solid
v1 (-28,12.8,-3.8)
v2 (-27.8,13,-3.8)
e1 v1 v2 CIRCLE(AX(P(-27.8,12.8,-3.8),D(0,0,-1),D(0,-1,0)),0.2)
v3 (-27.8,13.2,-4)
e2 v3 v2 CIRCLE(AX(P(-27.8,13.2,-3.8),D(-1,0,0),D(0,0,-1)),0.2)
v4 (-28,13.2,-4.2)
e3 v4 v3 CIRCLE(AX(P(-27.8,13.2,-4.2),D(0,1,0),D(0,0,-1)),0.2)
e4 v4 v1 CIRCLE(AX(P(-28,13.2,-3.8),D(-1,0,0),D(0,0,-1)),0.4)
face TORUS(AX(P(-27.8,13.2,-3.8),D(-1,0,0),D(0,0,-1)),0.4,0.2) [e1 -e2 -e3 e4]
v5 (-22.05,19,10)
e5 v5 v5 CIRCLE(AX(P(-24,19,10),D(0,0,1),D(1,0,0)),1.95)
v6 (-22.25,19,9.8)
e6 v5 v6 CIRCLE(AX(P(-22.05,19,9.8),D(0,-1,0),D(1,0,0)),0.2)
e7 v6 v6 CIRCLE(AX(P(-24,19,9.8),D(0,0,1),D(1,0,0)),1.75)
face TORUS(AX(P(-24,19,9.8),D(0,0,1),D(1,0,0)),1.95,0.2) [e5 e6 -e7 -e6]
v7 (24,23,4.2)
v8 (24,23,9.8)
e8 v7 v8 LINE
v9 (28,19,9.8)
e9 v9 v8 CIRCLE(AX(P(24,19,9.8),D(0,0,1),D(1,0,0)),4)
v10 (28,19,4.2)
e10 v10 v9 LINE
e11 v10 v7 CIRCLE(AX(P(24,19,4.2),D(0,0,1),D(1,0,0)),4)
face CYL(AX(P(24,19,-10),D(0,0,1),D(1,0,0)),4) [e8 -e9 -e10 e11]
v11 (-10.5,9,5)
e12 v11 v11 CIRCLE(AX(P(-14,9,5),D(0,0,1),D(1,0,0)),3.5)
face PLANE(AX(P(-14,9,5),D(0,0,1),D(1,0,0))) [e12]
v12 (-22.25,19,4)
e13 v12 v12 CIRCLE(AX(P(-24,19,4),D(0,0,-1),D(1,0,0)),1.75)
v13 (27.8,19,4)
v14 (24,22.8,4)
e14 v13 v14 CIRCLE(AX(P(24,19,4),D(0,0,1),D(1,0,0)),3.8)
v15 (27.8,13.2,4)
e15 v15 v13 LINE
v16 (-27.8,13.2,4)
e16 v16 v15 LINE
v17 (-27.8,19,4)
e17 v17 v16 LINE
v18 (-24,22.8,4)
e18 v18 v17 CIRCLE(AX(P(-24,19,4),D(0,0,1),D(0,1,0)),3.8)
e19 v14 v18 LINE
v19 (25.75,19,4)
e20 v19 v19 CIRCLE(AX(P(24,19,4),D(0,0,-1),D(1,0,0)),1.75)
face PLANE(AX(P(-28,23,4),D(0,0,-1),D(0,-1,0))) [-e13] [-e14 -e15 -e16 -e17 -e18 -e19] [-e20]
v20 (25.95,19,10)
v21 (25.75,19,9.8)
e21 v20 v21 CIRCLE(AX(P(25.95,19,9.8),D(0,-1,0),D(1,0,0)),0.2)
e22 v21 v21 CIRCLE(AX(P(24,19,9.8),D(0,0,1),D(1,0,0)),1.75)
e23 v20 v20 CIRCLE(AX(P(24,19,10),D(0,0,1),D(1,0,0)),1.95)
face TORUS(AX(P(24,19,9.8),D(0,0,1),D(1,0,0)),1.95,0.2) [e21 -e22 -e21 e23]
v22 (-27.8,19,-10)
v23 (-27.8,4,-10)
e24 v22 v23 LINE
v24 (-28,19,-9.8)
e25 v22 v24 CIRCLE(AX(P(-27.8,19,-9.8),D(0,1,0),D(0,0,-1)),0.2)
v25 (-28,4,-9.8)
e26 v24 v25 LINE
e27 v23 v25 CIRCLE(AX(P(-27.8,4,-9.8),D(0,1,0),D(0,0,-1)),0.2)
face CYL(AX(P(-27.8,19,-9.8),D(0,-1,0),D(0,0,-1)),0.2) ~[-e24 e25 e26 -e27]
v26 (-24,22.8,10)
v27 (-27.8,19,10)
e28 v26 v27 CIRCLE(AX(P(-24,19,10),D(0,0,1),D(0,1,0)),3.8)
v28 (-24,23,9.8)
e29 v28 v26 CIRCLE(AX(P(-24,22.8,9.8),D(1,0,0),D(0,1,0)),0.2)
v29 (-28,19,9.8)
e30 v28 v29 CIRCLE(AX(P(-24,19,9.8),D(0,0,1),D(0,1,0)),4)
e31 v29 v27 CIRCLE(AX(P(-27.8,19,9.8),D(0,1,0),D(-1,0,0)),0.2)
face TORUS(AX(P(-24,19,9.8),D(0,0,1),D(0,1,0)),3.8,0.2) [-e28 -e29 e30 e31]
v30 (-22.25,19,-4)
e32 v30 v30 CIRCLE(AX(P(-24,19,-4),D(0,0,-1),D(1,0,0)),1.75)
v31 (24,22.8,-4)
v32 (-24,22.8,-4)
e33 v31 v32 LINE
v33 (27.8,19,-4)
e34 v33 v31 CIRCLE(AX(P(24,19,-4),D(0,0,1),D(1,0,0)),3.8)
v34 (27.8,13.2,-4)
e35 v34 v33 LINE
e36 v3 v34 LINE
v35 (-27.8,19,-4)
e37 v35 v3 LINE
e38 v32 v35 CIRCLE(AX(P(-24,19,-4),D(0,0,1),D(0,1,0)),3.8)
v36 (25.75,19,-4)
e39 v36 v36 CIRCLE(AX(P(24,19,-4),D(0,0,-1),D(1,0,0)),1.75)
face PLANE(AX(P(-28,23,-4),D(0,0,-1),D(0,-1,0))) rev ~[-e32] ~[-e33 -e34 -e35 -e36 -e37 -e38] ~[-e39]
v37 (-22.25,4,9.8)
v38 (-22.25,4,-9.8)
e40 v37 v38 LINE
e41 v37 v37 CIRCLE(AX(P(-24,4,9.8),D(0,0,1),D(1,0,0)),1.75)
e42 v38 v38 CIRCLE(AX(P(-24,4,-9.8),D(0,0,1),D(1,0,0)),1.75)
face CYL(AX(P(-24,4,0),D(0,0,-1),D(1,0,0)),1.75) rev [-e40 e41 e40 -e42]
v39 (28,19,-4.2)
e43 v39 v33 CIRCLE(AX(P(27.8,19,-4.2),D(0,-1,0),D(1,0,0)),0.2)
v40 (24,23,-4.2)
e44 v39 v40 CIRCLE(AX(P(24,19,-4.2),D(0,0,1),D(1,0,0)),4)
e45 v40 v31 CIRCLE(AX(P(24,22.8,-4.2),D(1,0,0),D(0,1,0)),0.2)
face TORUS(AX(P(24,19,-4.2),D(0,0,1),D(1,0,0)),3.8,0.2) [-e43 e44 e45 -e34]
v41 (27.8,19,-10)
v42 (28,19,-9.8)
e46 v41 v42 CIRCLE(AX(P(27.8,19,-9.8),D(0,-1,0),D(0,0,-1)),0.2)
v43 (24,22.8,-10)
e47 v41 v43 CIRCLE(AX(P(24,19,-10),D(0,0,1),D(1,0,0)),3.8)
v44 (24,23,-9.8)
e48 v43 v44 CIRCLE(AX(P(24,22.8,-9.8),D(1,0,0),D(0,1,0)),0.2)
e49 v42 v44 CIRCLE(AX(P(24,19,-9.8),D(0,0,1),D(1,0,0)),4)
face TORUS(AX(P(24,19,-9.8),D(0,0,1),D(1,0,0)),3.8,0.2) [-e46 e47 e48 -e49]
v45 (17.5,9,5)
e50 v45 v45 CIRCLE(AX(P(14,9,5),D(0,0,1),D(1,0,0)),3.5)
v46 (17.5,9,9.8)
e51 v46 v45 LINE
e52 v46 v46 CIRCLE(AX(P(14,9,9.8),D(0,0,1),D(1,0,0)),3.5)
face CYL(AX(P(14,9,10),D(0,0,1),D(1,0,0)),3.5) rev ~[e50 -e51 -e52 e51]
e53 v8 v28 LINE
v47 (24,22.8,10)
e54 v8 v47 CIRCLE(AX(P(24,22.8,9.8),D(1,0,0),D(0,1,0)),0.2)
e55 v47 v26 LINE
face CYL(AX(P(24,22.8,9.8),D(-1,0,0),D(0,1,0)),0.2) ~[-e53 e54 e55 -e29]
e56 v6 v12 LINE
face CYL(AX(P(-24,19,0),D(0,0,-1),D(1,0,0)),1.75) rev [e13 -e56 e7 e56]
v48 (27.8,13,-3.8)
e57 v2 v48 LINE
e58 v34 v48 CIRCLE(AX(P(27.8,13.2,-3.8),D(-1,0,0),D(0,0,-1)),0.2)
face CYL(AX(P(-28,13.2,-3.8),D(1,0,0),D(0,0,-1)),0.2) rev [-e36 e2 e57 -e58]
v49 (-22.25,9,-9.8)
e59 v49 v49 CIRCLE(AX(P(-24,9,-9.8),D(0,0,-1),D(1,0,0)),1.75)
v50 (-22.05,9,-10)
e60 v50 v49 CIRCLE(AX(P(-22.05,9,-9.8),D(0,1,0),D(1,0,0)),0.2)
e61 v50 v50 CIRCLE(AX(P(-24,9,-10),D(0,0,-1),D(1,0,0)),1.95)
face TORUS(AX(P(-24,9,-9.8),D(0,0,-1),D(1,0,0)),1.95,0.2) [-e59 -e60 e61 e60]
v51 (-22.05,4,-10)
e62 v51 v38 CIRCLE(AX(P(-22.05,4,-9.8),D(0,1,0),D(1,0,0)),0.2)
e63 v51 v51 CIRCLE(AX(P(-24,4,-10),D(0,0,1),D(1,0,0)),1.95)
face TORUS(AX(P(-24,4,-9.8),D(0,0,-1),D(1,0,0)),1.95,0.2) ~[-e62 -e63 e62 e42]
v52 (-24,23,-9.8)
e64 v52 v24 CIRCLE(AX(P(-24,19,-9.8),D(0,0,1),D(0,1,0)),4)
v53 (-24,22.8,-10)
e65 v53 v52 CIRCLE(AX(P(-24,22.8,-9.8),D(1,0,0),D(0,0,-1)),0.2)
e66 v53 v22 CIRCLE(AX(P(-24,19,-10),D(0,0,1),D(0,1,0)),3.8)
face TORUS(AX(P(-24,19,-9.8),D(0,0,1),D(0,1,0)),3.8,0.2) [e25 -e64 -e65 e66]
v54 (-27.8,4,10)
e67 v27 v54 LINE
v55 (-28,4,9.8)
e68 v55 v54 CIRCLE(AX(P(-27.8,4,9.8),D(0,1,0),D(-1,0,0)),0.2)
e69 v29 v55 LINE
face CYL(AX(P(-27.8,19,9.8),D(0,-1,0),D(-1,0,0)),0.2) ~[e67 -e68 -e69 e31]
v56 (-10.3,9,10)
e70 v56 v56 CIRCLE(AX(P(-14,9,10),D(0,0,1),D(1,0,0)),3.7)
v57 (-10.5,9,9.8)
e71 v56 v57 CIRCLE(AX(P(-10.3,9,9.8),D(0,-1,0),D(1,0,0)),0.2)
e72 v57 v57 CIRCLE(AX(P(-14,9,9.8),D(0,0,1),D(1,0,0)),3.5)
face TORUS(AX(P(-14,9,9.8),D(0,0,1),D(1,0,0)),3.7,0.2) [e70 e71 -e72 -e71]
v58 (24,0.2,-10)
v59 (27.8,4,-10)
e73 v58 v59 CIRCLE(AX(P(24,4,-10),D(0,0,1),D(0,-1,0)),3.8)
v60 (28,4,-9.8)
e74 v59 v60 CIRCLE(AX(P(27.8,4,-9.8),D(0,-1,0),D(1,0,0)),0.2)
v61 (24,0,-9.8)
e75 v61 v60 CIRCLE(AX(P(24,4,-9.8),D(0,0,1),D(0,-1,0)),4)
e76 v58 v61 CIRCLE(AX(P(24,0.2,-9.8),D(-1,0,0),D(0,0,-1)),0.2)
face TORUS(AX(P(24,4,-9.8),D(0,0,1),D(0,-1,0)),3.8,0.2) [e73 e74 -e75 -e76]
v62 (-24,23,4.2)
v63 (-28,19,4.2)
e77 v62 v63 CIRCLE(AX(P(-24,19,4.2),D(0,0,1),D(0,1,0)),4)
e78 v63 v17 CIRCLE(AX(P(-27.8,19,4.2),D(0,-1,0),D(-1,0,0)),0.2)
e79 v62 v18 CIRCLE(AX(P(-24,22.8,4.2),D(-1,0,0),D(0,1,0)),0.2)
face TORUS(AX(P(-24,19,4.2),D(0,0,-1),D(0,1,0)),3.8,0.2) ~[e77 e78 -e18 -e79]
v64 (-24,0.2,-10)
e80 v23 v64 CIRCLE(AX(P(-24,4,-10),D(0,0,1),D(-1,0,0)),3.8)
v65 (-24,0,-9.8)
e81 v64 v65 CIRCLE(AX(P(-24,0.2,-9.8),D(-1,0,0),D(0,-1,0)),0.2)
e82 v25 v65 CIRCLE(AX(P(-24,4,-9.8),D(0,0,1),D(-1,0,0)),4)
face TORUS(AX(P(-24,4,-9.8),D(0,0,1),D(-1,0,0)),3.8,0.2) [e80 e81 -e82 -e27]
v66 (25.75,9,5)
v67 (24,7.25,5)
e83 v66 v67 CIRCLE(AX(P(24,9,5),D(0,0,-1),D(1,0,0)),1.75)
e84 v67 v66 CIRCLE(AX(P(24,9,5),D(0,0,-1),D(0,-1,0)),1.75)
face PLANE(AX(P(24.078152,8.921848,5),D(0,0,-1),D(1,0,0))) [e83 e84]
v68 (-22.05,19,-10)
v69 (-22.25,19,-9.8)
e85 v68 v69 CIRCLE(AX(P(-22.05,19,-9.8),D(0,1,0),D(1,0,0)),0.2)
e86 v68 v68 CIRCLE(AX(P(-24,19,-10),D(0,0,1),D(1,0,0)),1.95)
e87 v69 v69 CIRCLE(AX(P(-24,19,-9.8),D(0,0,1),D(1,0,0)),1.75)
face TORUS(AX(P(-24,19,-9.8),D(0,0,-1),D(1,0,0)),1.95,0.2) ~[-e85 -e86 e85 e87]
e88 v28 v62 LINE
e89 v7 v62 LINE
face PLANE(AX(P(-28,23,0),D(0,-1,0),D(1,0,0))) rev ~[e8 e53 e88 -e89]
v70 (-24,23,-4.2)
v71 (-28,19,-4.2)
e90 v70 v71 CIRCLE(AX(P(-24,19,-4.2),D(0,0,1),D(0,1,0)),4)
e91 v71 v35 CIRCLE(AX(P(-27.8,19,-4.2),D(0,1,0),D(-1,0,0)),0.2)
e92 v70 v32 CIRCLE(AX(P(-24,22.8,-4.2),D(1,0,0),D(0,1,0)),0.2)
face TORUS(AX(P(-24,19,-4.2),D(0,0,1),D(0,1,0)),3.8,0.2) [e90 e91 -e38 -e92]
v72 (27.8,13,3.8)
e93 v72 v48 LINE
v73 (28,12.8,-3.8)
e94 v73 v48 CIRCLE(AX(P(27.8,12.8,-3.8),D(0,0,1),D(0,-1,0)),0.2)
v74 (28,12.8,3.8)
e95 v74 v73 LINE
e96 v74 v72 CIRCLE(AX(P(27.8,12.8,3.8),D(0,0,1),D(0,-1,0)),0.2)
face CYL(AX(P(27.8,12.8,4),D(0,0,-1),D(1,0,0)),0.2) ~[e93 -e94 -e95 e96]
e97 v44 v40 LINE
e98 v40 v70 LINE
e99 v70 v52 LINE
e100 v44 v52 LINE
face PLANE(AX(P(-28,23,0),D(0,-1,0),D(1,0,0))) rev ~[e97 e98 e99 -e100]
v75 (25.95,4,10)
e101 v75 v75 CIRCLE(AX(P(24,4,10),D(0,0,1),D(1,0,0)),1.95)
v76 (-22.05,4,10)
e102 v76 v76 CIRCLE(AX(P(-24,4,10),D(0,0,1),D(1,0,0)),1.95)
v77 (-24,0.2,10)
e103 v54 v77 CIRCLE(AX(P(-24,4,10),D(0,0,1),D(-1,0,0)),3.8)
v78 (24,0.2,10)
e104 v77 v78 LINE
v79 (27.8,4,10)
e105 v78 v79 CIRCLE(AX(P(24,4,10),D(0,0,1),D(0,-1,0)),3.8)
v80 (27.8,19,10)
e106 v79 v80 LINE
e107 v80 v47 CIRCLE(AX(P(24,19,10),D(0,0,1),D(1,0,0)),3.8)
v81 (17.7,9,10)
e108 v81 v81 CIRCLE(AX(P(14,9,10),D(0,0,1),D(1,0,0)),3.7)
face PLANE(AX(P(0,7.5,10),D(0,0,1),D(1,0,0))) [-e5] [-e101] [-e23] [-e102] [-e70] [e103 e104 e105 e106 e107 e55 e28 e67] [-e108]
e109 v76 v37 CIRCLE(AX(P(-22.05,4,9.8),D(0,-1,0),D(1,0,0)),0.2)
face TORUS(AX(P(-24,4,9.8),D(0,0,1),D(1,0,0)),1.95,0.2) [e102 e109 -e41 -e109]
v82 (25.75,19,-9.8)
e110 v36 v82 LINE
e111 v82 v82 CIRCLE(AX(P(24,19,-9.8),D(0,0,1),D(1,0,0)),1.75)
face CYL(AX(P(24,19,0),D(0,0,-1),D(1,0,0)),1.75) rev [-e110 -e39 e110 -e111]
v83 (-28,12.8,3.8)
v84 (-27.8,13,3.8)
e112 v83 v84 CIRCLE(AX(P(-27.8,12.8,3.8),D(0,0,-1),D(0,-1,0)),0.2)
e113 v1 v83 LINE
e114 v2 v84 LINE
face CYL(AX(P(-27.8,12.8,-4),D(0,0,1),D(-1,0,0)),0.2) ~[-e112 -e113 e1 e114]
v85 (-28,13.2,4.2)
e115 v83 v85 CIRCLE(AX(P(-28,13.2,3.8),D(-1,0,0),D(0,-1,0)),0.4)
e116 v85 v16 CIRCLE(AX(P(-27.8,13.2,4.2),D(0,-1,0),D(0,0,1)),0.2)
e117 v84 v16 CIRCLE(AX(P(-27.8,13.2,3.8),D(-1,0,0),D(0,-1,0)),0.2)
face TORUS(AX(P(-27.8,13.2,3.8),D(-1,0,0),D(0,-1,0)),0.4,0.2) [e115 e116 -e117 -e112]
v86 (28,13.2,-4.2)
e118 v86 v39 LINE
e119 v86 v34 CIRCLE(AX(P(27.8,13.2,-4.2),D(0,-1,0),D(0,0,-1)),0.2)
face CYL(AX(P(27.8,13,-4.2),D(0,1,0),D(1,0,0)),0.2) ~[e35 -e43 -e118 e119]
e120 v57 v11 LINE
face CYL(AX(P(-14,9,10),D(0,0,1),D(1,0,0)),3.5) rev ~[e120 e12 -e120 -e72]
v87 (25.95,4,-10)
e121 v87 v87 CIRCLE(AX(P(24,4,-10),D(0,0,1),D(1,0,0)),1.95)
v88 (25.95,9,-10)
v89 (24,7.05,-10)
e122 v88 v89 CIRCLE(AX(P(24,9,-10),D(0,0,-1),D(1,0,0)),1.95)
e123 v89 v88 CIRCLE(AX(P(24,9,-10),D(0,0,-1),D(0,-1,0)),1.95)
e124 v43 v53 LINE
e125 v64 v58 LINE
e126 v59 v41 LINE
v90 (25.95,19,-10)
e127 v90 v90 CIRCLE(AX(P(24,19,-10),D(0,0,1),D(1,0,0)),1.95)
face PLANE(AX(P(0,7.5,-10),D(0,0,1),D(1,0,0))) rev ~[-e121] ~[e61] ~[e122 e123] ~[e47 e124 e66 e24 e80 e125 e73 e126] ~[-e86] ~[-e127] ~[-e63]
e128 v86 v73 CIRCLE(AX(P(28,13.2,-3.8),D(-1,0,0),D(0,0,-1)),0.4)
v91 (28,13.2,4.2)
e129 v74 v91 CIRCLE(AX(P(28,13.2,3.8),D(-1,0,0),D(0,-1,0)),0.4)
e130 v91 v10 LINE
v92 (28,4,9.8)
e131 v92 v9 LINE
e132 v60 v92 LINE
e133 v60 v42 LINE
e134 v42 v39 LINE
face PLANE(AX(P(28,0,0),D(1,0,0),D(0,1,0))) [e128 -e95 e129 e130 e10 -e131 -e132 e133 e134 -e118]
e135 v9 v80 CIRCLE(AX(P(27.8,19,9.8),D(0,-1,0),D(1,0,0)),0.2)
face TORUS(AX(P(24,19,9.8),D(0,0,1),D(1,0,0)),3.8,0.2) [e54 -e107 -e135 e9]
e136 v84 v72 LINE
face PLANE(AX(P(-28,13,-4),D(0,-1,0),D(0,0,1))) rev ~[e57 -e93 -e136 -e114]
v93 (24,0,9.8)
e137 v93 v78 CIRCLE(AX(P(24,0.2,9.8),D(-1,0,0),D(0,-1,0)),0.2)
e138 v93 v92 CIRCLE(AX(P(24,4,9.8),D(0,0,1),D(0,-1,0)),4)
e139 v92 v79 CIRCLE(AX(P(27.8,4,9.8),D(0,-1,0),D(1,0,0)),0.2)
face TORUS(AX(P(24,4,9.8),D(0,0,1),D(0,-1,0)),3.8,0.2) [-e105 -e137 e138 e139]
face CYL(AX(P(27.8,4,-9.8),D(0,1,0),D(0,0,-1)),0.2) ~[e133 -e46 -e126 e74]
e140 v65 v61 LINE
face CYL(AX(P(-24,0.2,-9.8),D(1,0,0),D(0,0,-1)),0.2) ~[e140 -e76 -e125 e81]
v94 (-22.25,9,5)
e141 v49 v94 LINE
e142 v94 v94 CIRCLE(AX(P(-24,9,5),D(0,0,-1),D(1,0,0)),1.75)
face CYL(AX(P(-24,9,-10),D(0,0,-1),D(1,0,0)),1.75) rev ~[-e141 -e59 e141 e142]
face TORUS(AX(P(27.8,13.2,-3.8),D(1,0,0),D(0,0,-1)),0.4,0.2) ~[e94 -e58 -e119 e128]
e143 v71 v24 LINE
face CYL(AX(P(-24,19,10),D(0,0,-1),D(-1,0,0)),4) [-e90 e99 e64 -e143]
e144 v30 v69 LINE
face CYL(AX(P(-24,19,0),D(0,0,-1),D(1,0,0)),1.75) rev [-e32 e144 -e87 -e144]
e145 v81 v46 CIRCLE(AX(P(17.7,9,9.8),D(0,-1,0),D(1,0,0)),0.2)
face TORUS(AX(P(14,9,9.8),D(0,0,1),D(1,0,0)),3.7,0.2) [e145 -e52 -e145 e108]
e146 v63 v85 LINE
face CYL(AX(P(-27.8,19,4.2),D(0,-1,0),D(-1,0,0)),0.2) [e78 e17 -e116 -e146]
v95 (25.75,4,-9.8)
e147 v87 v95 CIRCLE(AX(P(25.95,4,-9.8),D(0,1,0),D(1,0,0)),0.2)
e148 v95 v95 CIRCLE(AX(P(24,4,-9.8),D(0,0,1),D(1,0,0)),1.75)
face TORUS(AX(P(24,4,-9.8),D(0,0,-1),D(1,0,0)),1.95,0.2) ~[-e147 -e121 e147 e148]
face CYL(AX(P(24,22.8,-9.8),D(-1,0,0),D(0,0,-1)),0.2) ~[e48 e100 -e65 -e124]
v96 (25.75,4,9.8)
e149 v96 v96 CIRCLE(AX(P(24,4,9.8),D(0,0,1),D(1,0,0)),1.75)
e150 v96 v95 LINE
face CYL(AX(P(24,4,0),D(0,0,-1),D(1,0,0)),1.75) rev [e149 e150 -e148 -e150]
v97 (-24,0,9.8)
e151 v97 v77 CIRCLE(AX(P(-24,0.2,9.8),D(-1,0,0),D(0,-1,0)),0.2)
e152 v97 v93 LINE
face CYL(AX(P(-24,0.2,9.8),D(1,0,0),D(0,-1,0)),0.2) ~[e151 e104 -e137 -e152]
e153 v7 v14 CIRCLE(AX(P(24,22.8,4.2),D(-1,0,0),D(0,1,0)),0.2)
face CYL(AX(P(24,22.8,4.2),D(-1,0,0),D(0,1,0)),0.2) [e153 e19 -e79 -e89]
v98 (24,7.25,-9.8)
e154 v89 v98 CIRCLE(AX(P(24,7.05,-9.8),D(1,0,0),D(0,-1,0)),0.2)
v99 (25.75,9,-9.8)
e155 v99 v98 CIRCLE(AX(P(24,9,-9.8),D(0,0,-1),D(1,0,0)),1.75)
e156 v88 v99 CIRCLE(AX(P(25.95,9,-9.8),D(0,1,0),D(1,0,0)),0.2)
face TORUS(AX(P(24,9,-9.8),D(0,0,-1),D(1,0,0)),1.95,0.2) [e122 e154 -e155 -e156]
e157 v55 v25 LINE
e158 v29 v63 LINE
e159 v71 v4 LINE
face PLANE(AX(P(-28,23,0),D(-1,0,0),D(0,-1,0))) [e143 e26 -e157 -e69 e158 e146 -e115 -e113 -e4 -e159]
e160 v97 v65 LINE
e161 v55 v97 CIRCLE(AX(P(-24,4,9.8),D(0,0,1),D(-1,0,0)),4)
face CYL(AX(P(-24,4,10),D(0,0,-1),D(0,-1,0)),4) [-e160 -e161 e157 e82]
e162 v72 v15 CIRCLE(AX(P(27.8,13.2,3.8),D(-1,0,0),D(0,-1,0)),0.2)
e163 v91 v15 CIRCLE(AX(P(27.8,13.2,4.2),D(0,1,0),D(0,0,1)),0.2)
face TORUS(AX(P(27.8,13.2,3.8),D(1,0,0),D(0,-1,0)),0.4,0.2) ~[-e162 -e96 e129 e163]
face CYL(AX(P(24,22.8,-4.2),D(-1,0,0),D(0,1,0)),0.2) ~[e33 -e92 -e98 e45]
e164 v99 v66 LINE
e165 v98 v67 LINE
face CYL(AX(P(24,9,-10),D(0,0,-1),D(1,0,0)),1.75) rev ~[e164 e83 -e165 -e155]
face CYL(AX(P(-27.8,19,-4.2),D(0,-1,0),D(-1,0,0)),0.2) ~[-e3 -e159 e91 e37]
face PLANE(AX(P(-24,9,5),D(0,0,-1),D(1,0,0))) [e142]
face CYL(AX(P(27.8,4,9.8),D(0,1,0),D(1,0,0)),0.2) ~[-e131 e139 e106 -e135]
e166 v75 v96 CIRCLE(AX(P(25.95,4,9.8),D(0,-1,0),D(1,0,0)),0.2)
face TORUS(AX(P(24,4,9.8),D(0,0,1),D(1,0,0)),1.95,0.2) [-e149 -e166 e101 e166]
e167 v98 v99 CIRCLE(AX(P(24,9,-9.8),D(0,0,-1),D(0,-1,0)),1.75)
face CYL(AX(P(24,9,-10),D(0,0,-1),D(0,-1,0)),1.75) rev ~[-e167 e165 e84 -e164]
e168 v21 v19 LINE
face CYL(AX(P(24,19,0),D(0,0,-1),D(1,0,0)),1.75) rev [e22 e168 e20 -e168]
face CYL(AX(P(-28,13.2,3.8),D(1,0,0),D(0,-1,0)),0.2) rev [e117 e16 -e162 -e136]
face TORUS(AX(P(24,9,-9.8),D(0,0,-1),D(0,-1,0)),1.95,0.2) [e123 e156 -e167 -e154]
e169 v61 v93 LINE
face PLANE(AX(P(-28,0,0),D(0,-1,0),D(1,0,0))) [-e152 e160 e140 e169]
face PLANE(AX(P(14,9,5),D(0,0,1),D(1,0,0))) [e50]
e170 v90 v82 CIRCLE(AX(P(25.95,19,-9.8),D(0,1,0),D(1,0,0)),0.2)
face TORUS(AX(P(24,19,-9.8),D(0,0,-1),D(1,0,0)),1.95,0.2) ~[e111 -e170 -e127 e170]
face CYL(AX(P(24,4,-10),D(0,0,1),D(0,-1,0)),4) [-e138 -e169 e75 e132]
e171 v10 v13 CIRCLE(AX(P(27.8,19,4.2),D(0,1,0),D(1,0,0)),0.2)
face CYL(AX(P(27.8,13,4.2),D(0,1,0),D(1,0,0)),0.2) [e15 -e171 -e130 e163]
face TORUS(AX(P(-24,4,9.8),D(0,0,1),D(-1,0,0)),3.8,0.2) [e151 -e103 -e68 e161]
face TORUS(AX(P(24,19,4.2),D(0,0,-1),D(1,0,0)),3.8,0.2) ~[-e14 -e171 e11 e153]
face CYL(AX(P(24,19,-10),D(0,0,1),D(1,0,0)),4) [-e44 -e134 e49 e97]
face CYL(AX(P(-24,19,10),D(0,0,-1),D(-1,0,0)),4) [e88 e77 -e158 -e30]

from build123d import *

# Parameters (mm, degrees)
F0_W     = 56
F0_H     = 15
F0_R     = 1.75
F0_H_2   = 8
F1_DEPTH = 10
F2_R     = 3.5
F3_DEPTH = 5
F5_R     = 4
F4_W     = 10
F4_H     = 8
F6_DEPTH = 56.001
F7_R     = 1.75
F8_DEPTH = 15
F9_R     = 0.2


# Not quite as in the source:
# - a feature names something its author has since deleted; it is built from what else it names


with BuildPart() as f1:
    # F0 (on Top) → F1 (new body, symmetric)
    with BuildSketch(Plane.XY):
        with Locations((0, 7.5)):
            Rectangle(F0_W, F0_H)
        with Locations((-24, 4)):
            Circle(F0_R, mode=Mode.SUBTRACT)
        with Locations((24, 4)):
            Circle(F0_R, mode=Mode.SUBTRACT)
        with Locations((0, 19)):
            Rectangle(F0_W, F0_H_2)
        with Locations((-24, 19)):
            Circle(F0_R, mode=Mode.SUBTRACT)
        with Locations((24, 19)):
            Circle(F0_R, mode=Mode.SUBTRACT)
    extrude(amount=F1_DEPTH, both=True)

    # F2 (on face) → F3 (cut)
    with BuildSketch(Plane.XY.offset(10)):
        with Locations((-14, 9)):
            Circle(F2_R)
        with Locations((14, 9)):
            Circle(F2_R)
    extrude(amount=-F3_DEPTH, mode=Mode.SUBTRACT)

    # F5
    f5_edges = [f1.edges().sort_by_distance(p)[0] for p in [
        (-28, 23, 0),
        (28, 23, 0),
        (-28, 0, 0),
        (28, 0, 0),
    ]]
    fillet(f5_edges, radius=F5_R)

    # F4 (on face) → F6 (cut, through all)
    with BuildSketch(Plane(origin=(-28, 0, 0), x_dir=(0, -1, 0), z_dir=(-1, 0, 0))):
        with Locations((-18, 0)):
            Rectangle(F4_W, F4_H)
    extrude(amount=-F6_DEPTH, mode=Mode.SUBTRACT)

    # F7 (on face) → F8 (cut)
    with BuildSketch(Plane(origin=(0, 0, -10), x_dir=(1, 0, 0), z_dir=(0, 0, -1))):
        with BuildLine():
            ThreePointArc((24, -7.25), (22.7625631329, -10.2374368671), (25.75, -9))
            ThreePointArc((25.75, -9), (25.2374368671, -7.7625631329), (24, -7.25))
        make_face()
        with Locations((-24, -9)):
            Circle(F7_R)
    extrude(amount=-F8_DEPTH, mode=Mode.SUBTRACT)

    # F9
    f9_edges = [f1.edges().sort_by_distance(p)[0] for p in [
        (0, 0, 10),
        (-26.828427, 1.171573, 10),
        (26.828427, 1.171573, 10),
        (-28, 11.5, 10),
        (28, 11.5, 10),
        (-26.828427, 21.828427, 10),
        (26.828427, 21.828427, 10),
        (0, 23, 10),
        (-25.75, 4, 10),
        (-17.5, 9, 10),
        (22.25, 4, 10),
        (10.5, 9, 10),
        (-25.75, 19, 10),
        (22.25, 19, 10),
        (-28, 19, -7),
        (-28, 16, -4),
        (-28, 13, 0),
        (-28, 16, 4),
        (-28, 19, 7),
        (-28, 4, 0),
        (-28, 11.5, -10),
        (0, 0, -10),
        (-26.828427, 1.171573, -10),
        (26.828427, 1.171573, -10),
        (28, 11.5, -10),
        (-26.828427, 21.828427, -10),
        (26.828427, 21.828427, -10),
        (0, 23, -10),
        (-25.75, 4, -10),
        (-25.75, 9, -10),
        (22.25, 4, -10),
        (22.25, 9, -10),
        (-25.75, 19, -10),
        (22.25, 19, -10),
        (0, 13, 4),
        (28, 13, 0),
        (0, 13, -4),
    ]]
    fillet(f9_edges, radius=F9_R)


solid = f1.part
